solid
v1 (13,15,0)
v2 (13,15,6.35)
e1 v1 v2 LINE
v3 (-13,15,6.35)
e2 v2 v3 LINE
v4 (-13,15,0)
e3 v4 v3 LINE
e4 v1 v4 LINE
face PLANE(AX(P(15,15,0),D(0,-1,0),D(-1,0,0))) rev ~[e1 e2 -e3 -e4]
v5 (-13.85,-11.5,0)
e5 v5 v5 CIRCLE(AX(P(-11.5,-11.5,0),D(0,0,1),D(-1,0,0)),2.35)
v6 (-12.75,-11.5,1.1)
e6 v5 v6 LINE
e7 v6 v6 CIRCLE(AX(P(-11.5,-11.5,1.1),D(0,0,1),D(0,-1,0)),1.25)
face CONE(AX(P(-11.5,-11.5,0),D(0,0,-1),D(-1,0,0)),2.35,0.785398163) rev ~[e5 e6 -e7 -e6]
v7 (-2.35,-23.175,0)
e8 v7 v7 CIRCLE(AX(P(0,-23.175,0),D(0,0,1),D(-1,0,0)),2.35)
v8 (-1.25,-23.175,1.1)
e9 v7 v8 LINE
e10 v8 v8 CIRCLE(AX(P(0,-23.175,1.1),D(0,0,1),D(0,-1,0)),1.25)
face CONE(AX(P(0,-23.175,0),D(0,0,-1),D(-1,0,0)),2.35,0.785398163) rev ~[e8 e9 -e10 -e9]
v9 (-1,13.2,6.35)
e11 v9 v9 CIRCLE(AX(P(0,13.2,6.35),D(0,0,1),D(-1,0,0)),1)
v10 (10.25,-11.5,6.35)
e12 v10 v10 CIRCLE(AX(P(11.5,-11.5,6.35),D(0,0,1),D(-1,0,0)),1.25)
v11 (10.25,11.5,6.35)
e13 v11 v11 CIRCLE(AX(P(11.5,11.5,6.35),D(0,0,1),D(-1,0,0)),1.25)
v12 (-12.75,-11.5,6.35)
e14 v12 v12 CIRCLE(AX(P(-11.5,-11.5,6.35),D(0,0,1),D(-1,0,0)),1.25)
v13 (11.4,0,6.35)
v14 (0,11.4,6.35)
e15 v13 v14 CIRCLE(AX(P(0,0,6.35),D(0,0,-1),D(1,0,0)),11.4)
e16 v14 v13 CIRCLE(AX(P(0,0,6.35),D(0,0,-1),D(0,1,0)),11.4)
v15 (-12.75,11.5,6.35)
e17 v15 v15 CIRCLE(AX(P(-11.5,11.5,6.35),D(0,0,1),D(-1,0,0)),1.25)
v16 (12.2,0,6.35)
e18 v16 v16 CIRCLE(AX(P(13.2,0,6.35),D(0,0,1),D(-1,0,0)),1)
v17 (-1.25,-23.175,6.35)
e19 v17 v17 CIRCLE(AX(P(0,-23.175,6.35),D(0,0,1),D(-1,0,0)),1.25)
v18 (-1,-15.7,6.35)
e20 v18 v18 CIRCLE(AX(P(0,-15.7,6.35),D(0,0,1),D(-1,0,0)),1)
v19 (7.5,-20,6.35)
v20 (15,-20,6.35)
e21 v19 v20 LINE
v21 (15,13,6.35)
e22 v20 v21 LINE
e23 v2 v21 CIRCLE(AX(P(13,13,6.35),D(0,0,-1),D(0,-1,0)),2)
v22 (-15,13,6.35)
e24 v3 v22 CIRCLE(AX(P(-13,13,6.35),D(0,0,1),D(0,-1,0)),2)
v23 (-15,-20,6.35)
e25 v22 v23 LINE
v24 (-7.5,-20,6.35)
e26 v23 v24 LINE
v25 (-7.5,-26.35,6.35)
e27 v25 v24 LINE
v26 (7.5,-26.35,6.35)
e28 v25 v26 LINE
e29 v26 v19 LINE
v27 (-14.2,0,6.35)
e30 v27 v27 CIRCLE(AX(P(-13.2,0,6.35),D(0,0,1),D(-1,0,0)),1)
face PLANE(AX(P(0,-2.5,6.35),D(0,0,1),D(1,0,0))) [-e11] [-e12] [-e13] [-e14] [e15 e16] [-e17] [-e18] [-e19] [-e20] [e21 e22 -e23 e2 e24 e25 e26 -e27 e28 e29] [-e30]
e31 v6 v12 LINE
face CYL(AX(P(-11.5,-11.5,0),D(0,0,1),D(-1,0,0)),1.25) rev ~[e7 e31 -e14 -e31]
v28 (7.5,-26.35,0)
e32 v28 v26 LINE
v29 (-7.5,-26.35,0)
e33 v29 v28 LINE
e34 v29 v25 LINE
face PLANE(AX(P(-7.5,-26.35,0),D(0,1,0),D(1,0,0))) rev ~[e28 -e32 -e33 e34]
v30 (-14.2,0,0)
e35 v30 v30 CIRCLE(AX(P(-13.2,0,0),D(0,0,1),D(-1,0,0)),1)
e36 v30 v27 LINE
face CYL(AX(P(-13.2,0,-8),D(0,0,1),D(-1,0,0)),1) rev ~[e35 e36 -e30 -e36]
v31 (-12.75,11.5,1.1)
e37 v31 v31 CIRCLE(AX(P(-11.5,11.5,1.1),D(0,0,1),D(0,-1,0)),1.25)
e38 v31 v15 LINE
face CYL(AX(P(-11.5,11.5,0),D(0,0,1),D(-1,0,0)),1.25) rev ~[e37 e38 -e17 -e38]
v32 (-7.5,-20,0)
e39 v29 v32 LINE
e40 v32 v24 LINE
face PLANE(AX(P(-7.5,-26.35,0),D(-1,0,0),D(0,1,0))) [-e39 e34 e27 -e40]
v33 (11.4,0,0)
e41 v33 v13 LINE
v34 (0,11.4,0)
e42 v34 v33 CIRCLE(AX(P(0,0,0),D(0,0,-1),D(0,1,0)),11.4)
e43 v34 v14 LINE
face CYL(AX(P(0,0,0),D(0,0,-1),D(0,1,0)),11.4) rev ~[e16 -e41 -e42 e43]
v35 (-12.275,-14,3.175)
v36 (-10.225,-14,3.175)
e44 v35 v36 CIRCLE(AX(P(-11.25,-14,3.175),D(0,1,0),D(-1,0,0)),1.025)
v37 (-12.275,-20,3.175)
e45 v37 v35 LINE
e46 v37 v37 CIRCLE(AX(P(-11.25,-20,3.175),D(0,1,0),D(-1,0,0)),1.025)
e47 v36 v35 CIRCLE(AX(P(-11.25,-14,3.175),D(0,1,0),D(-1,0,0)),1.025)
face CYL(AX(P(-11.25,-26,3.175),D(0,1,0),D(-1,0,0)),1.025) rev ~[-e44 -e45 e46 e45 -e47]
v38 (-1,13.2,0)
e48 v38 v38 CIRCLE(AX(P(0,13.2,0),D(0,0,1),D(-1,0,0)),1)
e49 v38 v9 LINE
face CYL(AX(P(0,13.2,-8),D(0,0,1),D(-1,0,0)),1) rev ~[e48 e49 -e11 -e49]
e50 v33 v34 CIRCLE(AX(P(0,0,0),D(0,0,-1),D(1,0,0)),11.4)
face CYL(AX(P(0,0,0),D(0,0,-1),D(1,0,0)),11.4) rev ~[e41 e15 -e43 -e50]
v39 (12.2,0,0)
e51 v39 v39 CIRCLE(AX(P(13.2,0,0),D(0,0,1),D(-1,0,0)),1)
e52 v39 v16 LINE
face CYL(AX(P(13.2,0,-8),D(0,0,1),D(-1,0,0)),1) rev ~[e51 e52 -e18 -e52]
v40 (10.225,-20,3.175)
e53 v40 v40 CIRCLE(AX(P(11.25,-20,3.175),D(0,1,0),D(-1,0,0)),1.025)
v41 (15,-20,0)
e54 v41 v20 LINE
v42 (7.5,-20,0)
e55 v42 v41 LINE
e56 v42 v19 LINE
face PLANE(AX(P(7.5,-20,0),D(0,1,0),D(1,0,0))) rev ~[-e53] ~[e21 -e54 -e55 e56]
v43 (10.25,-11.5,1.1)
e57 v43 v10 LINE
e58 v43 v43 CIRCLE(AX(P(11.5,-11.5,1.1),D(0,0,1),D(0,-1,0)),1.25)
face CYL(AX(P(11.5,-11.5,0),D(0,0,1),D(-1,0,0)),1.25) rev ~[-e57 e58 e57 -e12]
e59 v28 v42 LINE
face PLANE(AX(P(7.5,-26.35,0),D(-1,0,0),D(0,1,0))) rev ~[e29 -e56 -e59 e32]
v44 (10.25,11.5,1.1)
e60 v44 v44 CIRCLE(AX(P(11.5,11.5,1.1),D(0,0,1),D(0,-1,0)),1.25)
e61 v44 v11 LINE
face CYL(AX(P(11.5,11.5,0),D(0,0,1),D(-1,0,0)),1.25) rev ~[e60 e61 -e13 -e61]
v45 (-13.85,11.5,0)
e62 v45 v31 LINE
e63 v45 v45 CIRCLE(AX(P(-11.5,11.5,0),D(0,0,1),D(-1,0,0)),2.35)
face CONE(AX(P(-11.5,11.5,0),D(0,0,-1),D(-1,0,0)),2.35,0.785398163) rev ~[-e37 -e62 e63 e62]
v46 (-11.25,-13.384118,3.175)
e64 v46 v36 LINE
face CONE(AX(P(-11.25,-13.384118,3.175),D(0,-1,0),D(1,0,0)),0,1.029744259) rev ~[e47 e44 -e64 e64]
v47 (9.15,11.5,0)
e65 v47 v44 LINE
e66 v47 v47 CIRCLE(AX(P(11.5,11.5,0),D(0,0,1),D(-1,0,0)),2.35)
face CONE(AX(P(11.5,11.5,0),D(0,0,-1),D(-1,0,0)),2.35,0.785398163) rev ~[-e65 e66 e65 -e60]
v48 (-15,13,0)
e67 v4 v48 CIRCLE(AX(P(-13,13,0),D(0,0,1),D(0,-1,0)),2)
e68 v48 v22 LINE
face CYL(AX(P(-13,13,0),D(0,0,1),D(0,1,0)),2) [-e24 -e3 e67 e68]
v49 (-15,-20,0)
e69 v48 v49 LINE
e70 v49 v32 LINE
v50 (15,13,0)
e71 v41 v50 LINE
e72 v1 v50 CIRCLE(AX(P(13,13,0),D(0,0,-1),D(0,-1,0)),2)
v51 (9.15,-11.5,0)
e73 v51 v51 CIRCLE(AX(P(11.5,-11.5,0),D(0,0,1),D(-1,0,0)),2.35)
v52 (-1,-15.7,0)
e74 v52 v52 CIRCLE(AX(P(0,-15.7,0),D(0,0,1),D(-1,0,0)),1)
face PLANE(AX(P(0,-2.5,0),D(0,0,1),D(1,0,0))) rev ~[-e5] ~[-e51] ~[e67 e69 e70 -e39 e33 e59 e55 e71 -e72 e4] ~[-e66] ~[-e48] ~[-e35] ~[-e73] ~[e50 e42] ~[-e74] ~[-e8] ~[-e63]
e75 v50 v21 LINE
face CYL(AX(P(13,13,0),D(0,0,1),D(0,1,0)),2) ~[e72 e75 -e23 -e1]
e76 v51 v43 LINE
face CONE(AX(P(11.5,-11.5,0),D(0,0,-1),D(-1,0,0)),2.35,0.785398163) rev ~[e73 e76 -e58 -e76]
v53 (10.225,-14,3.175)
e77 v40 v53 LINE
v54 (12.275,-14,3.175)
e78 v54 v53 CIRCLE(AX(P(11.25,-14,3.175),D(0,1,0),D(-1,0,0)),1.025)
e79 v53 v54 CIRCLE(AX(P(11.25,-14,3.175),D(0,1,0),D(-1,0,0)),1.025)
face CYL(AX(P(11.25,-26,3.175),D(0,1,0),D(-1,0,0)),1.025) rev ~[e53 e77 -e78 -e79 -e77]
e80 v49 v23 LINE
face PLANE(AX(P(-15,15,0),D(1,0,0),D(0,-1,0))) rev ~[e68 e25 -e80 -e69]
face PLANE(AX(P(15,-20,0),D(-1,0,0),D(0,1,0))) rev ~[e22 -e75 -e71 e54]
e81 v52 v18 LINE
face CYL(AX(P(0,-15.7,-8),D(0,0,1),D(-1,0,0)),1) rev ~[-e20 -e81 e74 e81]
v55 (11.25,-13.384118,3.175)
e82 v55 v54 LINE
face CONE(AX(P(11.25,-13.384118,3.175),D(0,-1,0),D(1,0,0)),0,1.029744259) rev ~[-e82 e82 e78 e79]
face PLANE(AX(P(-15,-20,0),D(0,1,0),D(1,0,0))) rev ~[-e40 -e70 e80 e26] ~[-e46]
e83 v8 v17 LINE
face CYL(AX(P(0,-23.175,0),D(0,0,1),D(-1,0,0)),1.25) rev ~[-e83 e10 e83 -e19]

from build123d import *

# Parameters (mm, degrees)
F0_W           = 15
F0_H           = 6.35
F1_DEPTH       = 6.35
F2_R           = 2
F5_D           = 2.05
F5_DEPTH       = 6
F5_TIP         = 0.6158821345
F5_ON_F3_D     = 2.05
F5_ON_F3_DEPTH = 6
F5_ON_F3_TIP   = 0.6158821345
F6_D           = 2.5
F6_CSINK_D     = 4.7
F6_CSINK_ANGLE = 90
F7_D           = 2
F7_DEPTH       = 8
F7_TIP         = 0.600860619


# Not quite as in the source:
# - a length typed as a fraction of an inch, garbled in the dataset ("3 / 203.2 mm" for 3/8 in), is restored


with BuildPart() as f1:
    # F0 (on Top) → F1 (new body)
    with BuildSketch(Plane.XY):
        Polygon((15, 15), (-15, 15), (-15, -20), (-7.5, -20), (7.5, -20), (15, -20), align=None)
        with BuildLine():
            ThreePointArc((0, 11.4), (8.0610173055, 8.0610173055), (11.4, 0))
            ThreePointArc((11.4, 0), (-8.0610173055, -8.0610173055), (0, 11.4))
        make_face(mode=Mode.SUBTRACT)
        with Locations((0, -23.175)):
            Rectangle(F0_W, F0_H)
    extrude(amount=F1_DEPTH)

    # F2
    f2_edges = [f1.edges().sort_by_distance(p)[0] for p in [
        (15, 15, 3.175),
        (-15, 15, 3.175),
    ]]
    fillet(f2_edges, radius=F2_R)

    # F5
    with Locations(Plane.XZ.offset(20)):
        with Locations((-11.25, 3.175)):
            Hole(F5_D / 2, depth=F5_DEPTH)
            with Locations((0, 0, -(F5_DEPTH + F5_TIP / 2))):  # 118° drill point
                Cone(0, F5_D / 2, F5_TIP, mode=Mode.SUBTRACT)

    # F5 on F3
    with Locations(Plane.XZ.offset(20)):
        with Locations((11.25, 3.175)):
            Hole(F5_ON_F3_D / 2, depth=F5_ON_F3_DEPTH)
            with Locations((0, 0, -(F5_ON_F3_DEPTH + F5_ON_F3_TIP / 2))):  # 118° drill point
                Cone(0, F5_ON_F3_D / 2, F5_ON_F3_TIP, mode=Mode.SUBTRACT)

    # F6 (through all)
    with Locations(Plane(origin=(0, 0, 0), x_dir=(1, 0, 0), z_dir=(0, 0, -1))):
        with Locations((-11.5, -11.5), (11.5, -11.5), (-11.5, 11.5), (11.5, 11.5), (0, 23.175)):
            CounterSinkHole(F6_D / 2, F6_CSINK_D / 2, counter_sink_angle=F6_CSINK_ANGLE)

    # F7
    with Locations(Plane(origin=(0, 0, 0), x_dir=(1, 0, 0), z_dir=(0, 0, -1))):
        with Locations((13.2, 0), (0, -13.2), (-13.2, 0), (0, 15.7)):
            Hole(F7_D / 2, depth=F7_DEPTH)
            with Locations((0, 0, -(F7_DEPTH + F7_TIP / 2))):  # 118° drill point
                Cone(0, F7_D / 2, F7_TIP, mode=Mode.SUBTRACT)


solid = f1.part
